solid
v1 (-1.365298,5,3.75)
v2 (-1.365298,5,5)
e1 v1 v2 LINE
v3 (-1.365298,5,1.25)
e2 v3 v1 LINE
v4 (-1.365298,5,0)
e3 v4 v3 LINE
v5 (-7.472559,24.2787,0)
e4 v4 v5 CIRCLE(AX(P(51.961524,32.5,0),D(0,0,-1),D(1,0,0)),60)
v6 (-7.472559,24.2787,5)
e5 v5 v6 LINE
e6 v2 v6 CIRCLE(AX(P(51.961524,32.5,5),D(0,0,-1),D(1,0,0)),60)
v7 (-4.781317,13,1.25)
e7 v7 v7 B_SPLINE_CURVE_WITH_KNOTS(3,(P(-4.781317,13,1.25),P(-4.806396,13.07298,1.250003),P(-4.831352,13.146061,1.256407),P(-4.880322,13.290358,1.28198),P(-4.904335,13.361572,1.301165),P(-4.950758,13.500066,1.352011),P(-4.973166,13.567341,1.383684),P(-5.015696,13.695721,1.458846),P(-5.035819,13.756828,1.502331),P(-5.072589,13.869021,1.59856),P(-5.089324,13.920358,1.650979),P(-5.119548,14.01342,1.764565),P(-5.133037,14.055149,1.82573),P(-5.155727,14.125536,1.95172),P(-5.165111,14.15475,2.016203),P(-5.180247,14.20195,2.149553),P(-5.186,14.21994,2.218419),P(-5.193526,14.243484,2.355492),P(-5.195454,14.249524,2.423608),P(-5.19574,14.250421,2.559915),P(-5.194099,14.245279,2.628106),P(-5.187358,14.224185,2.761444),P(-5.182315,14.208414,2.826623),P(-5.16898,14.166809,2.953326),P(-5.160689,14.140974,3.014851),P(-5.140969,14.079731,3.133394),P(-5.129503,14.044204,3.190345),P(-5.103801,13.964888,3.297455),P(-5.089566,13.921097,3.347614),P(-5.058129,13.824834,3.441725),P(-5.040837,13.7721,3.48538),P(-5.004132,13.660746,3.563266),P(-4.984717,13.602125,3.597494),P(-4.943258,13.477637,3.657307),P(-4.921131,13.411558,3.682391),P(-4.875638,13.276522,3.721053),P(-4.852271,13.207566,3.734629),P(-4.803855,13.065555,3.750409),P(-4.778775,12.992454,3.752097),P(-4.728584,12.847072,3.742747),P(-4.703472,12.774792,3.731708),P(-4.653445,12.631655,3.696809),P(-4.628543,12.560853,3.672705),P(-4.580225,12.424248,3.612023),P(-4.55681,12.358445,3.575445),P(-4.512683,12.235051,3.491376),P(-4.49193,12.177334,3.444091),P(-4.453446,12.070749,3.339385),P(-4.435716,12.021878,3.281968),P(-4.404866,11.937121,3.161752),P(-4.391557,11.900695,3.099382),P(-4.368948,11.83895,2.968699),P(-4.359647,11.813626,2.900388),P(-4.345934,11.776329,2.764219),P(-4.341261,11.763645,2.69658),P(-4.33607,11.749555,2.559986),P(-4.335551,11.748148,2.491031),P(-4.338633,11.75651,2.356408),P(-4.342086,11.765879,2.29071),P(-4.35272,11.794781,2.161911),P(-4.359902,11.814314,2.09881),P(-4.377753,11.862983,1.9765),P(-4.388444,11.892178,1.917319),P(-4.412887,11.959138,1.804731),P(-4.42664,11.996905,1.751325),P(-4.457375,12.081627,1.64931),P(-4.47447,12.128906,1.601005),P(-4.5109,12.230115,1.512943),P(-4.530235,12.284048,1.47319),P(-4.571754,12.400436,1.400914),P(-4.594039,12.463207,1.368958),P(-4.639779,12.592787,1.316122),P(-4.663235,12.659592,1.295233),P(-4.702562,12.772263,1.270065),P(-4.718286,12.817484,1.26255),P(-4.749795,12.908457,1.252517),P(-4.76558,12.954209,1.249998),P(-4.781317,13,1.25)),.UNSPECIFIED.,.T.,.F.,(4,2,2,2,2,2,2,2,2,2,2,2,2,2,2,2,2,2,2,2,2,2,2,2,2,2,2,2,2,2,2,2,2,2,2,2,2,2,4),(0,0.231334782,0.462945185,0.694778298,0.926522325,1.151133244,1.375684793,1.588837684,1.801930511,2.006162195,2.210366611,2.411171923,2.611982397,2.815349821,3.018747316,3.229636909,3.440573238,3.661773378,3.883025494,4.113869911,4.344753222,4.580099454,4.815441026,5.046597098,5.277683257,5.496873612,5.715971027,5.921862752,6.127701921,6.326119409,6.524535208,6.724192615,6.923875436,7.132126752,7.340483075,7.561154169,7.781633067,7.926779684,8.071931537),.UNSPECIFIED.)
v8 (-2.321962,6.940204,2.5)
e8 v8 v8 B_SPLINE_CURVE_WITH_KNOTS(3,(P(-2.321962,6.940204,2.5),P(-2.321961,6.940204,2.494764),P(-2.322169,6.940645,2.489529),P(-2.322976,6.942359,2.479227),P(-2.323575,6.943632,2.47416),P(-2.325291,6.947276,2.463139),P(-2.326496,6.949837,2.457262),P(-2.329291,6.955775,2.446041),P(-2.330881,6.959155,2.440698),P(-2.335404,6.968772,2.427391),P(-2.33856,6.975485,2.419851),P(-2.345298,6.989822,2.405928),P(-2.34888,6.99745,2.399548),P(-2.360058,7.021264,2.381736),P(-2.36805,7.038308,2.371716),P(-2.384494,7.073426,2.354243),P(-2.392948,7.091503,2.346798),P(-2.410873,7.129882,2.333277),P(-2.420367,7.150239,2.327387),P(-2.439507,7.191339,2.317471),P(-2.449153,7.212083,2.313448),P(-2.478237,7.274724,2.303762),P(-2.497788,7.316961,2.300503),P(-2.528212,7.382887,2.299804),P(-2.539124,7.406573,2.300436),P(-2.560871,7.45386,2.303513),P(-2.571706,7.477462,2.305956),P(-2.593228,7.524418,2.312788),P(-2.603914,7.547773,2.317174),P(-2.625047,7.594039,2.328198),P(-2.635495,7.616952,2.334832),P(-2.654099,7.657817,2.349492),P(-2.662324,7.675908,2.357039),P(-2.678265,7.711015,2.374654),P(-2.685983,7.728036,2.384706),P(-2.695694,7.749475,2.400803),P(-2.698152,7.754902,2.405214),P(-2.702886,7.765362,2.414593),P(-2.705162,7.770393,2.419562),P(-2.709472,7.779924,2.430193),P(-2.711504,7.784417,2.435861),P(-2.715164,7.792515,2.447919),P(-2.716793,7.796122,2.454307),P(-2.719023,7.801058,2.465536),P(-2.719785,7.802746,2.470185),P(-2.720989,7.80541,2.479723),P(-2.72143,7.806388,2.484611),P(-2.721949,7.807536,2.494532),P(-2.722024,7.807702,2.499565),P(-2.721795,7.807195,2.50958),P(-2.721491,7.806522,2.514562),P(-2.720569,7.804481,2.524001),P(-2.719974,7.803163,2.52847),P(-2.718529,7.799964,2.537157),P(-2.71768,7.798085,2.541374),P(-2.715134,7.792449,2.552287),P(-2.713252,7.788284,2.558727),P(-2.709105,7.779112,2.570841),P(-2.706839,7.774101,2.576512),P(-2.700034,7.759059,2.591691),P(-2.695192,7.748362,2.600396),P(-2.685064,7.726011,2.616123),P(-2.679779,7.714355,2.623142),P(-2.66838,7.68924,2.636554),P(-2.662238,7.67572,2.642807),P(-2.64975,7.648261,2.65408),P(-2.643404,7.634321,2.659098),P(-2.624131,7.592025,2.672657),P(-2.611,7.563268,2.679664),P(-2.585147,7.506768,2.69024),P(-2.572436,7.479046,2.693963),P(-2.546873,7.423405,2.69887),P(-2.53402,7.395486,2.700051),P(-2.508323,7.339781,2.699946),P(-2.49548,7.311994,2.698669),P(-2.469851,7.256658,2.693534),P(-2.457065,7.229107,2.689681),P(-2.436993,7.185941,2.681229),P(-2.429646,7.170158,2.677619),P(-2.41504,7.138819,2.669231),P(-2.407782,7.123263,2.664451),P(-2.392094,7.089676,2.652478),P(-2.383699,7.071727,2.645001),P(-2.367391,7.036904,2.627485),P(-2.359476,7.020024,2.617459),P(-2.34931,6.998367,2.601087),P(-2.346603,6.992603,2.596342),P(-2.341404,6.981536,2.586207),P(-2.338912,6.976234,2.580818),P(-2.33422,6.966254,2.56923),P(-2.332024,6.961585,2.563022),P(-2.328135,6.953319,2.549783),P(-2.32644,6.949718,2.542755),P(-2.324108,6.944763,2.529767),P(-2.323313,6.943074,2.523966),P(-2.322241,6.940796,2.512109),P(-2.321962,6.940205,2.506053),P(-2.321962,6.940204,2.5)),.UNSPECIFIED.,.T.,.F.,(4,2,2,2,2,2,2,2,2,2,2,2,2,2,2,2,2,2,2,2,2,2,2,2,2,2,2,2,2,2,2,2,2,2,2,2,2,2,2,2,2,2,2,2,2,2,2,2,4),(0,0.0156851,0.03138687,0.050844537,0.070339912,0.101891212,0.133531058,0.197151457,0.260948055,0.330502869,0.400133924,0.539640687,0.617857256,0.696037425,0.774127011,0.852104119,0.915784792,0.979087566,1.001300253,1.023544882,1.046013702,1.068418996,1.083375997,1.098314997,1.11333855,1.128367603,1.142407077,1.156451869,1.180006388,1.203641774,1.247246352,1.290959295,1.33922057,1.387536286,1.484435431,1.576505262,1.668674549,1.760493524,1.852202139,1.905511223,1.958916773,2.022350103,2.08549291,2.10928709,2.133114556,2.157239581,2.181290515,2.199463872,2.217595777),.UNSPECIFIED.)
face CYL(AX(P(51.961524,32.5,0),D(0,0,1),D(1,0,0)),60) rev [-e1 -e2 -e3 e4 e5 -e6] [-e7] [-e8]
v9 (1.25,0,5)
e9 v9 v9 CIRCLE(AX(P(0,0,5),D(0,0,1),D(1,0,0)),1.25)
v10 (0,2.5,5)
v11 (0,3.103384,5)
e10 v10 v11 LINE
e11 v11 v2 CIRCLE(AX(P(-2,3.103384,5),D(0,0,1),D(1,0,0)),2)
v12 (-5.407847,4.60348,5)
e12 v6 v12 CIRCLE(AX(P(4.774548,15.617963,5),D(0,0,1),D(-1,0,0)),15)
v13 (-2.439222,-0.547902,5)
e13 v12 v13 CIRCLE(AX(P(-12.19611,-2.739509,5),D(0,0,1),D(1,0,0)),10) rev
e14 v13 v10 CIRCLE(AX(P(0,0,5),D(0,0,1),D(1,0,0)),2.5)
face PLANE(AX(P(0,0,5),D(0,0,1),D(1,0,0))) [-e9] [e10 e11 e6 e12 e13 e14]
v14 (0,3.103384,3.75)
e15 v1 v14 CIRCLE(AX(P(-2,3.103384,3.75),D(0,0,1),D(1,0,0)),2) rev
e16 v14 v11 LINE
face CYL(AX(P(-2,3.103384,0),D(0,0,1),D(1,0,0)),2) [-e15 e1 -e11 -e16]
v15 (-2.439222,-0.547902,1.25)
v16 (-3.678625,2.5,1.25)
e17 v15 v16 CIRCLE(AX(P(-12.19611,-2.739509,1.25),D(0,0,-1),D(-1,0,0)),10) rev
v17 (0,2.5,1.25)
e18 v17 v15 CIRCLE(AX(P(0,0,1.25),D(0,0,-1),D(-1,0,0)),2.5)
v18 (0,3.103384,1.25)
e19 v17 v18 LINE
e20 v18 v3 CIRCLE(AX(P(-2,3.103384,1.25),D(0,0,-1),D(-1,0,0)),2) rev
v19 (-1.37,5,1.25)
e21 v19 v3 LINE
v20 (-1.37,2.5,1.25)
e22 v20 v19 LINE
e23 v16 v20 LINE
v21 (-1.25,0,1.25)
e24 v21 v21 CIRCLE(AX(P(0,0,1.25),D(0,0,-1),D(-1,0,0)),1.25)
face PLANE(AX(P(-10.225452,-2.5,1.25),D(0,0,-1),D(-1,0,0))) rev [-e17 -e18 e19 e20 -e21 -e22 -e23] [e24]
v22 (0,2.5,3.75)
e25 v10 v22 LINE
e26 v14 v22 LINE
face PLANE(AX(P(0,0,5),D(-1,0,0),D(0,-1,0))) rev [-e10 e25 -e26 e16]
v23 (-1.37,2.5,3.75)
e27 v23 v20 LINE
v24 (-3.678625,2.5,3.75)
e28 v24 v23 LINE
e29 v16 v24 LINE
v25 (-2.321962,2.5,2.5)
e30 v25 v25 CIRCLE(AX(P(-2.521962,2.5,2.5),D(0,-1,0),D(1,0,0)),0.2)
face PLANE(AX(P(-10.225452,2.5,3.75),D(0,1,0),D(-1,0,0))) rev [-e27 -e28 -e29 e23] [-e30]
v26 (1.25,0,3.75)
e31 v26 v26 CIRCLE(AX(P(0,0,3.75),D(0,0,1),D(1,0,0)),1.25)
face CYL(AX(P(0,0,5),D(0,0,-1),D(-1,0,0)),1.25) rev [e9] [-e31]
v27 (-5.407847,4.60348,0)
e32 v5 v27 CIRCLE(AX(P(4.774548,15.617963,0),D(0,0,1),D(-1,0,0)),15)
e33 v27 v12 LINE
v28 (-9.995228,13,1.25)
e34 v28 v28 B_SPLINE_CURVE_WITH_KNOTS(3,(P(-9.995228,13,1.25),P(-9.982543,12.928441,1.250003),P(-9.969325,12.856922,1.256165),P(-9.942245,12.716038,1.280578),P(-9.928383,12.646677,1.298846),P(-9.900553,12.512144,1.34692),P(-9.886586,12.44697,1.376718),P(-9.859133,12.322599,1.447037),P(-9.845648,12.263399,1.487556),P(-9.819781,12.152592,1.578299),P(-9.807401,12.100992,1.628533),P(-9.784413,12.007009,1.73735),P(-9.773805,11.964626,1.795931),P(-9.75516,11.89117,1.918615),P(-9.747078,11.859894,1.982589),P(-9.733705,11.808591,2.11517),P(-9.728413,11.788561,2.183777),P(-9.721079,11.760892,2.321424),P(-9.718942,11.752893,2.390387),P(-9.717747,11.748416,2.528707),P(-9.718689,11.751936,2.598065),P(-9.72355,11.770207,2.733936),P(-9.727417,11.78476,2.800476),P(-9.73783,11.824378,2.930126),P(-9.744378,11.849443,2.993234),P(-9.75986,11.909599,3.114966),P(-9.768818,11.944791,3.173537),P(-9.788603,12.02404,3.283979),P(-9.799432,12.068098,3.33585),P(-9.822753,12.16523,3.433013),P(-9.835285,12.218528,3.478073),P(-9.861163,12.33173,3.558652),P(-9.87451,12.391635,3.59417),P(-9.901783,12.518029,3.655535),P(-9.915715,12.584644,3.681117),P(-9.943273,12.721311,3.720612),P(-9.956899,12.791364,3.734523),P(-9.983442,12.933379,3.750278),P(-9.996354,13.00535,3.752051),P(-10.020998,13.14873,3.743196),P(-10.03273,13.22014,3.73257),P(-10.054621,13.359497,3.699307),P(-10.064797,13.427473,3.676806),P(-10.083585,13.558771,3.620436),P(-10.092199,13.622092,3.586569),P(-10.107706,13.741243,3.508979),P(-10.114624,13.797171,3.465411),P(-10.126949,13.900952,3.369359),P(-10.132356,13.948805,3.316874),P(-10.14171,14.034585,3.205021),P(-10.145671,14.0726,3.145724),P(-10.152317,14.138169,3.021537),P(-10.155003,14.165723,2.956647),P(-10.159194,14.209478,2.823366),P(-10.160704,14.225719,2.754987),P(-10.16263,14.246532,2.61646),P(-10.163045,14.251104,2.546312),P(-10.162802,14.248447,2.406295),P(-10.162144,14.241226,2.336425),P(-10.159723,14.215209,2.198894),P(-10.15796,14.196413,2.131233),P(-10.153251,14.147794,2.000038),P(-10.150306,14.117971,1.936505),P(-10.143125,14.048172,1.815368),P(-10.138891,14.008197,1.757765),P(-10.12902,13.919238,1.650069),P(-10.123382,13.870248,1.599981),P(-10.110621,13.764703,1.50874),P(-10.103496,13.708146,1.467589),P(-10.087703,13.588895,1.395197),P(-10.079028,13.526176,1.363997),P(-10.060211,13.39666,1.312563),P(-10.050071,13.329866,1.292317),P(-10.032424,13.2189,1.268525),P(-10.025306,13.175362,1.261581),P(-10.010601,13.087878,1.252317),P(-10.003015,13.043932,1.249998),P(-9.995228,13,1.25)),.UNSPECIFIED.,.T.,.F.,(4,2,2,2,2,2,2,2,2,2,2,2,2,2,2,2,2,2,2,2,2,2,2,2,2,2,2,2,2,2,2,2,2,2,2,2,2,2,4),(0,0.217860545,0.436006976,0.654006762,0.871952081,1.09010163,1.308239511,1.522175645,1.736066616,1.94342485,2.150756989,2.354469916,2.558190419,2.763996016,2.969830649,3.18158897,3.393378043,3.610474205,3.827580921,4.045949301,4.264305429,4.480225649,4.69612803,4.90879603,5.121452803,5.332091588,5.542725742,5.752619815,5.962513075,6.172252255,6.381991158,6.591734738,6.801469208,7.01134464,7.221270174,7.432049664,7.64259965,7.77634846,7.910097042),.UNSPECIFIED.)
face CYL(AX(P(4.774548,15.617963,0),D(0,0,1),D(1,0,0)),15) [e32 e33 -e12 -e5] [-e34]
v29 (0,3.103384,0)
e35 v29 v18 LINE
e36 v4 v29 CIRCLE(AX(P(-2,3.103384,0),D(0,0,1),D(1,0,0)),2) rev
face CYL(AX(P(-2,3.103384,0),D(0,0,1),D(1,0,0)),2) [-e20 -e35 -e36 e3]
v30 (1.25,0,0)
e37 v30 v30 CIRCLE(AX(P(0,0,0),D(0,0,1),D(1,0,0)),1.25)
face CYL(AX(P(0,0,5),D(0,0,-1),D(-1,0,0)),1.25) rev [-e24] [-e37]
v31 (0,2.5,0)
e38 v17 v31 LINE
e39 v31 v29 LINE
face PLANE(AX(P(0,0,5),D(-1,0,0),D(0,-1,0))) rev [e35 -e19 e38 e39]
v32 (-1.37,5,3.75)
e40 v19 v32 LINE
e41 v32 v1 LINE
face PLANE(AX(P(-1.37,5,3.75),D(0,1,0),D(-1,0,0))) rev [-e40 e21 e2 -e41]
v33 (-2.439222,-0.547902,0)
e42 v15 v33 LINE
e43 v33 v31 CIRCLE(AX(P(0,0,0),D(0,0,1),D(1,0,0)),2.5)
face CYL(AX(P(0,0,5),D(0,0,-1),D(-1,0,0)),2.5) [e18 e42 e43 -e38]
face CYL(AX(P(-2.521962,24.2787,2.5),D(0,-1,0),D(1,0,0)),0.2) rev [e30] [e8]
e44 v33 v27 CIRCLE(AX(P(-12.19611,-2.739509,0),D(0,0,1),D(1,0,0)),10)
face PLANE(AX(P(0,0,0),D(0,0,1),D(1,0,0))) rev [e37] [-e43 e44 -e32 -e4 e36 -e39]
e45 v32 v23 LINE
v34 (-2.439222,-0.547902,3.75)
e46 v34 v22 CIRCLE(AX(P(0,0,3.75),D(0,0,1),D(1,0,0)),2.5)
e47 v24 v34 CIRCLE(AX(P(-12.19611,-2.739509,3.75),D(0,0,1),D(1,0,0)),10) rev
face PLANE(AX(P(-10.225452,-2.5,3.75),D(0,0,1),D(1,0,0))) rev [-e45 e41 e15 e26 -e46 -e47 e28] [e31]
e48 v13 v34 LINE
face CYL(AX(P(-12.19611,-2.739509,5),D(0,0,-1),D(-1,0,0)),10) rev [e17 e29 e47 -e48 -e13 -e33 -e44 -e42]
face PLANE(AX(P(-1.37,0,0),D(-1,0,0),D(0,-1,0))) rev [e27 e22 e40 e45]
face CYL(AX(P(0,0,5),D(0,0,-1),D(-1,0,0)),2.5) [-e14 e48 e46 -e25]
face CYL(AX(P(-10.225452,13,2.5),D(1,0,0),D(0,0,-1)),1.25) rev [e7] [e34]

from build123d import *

# Parameters (mm, degrees)
SKETCH1_R               = 1.25
BOSS_EXTRUDE1_DEPTH     = 5
BOSS_EXTRUDE2_DEPTH     = 5
FILLET2_R               = 10
CUT_EXTRUDE2_DEPTH      = 27.814458153
CUT_EXTRUDE2_DEPTH_BACK = 27.814458153
SKETCH4_W               = 2.5
SKETCH4_H               = 5
SKETCH5_W               = 2.5
SKETCH5_H               = 2.5
CUT_EXTRUDE3_DEPTH      = 1.37
FILLET3_R               = 2
SKETCH6_R               = 1.25
CUT_EXTRUDE4_DEPTH      = 27.814458153
SKETCH7_R               = 0.2
CUT_EXTRUDE5_DEPTH      = 25.573800354


with BuildPart() as part:
    # Sketch1 → Boss-Extrude1 (new body)
    with BuildSketch(Plane.XY):
        with BuildLine():
            Line((0, 2.5), (0, 5))
            Line((0, 5), (-2.5, 5))
            Line((-2.5, 5), (-2.5, 0))
            ThreePointArc((-2.5, 0), (1.767766953, -1.767766953), (0, 2.5))
        make_face()
        Circle(SKETCH1_R, mode=Mode.SUBTRACT)
    extrude(amount=BOSS_EXTRUDE1_DEPTH)

    # Sketch2 → Boss-Extrude2 (add)
    with BuildSketch(Plane.XY.offset(5)):
        with BuildLine():
            Line((-2.5, 2.5), (0, 2.5))
            ThreePointArc((0, 2.5), (-4.79077334, 13.027539424), (-7.472558856, 24.278700341))
            ThreePointArc((-7.472558856, 24.278700341), (-9.849121132, 12.279055883), (-2.5, 2.5))
        make_face()
    extrude(amount=-BOSS_EXTRUDE2_DEPTH)

    # Fillet2
    fillet2_edges = [part.edges().sort_by_distance(p)[0] for p in [
        (-2.5, 2.5, 2.5),
    ]]
    fillet(fillet2_edges, radius=FILLET2_R)

    # Sketch4 → Cut-Extrude2 (cut, two sides: drawn at the far end of the back side and taken through both)
    with BuildSketch(Plane(origin=(0, 0, 0), x_dir=(0, 0, -1), z_dir=(1, 0, 0)).offset(-CUT_EXTRUDE2_DEPTH_BACK)):
        with Locations((-2.5, 0)):
            Rectangle(SKETCH4_W, SKETCH4_H)
    extrude(amount=CUT_EXTRUDE2_DEPTH + CUT_EXTRUDE2_DEPTH_BACK, mode=Mode.SUBTRACT)

    # Sketch5 → Cut-Extrude3 (cut)
    with BuildSketch(Plane(origin=(0, 0, 0), x_dir=(0, 0, -1), z_dir=(1, 0, 0))):
        with Locations((-2.5, 3.75)):
            Rectangle(SKETCH5_W, SKETCH5_H)
    extrude(amount=-CUT_EXTRUDE3_DEPTH, mode=Mode.SUBTRACT)

    # Fillet3
    # the kernel refuses this fillet: 2 mm, written as the material it takes off along each edge
    with BuildSketch(Plane(origin=(0, 5, -4.741540982), x_dir=(0, -1, 0), z_dir=(0, 0, 1))) as fillet3_piece_1:
        with BuildLine():
            CenterArc((1.896616393, -2), FILLET3_R, 90, 71.497208819)
            Line((0, -1.365298292), (-0.037932328, -1.352604258))
            ThreePointArc((-0.037932328, -1.352604258), (-0.04, -0.682649146), (-0.04, 0))
            Line((-0.04, 0), (0, 0.04))
            Line((0, 0.04), (1.896616393, 0.04))
            Line((1.896616393, 0.04), (1.896616393, 0))
        make_face()
    extrude(amount=10.733081965, mode=Mode.SUBTRACT)
    with BuildSketch(Plane(origin=(0, 5, -0.991540982), x_dir=(-1, 0, 0), z_dir=(0, 0, 1))) as fillet3_piece_2:
        with BuildLine():
            CenterArc((2, 1.896616393), FILLET3_R, 180, 71.497208819)
            Line((0, 1.896616393), (-0.04, 1.896616393))
            Line((-0.04, 1.896616393), (-0.04, 0))
            Line((-0.04, 0), (0, -0.04))
            ThreePointArc((0, -0.04), (0.682649146, -0.04), (1.352604258, -0.037932328))
            Line((1.352604258, -0.037932328), (1.365298292, 0))
        make_face()
    extrude(amount=10.733081965, mode=Mode.SUBTRACT)

    # Sketch6 → Cut-Extrude4 (cut, through all)
    with BuildSketch(Plane(origin=(0, 0, 0), x_dir=(0, 0, -1), z_dir=(1, 0, 0))):
        with Locations((-2.5, 13)):
            Circle(SKETCH6_R)
    extrude(amount=-CUT_EXTRUDE4_DEPTH, mode=Mode.SUBTRACT)

    # Sketch7 → Cut-Extrude5 (cut, through all)
    with BuildSketch(Plane.XZ.offset(-2.5)):
        with Locations((-2.521961644, 2.5)):
            Circle(SKETCH7_R)
    extrude(amount=-CUT_EXTRUDE5_DEPTH, mode=Mode.SUBTRACT)


solid = part.part
